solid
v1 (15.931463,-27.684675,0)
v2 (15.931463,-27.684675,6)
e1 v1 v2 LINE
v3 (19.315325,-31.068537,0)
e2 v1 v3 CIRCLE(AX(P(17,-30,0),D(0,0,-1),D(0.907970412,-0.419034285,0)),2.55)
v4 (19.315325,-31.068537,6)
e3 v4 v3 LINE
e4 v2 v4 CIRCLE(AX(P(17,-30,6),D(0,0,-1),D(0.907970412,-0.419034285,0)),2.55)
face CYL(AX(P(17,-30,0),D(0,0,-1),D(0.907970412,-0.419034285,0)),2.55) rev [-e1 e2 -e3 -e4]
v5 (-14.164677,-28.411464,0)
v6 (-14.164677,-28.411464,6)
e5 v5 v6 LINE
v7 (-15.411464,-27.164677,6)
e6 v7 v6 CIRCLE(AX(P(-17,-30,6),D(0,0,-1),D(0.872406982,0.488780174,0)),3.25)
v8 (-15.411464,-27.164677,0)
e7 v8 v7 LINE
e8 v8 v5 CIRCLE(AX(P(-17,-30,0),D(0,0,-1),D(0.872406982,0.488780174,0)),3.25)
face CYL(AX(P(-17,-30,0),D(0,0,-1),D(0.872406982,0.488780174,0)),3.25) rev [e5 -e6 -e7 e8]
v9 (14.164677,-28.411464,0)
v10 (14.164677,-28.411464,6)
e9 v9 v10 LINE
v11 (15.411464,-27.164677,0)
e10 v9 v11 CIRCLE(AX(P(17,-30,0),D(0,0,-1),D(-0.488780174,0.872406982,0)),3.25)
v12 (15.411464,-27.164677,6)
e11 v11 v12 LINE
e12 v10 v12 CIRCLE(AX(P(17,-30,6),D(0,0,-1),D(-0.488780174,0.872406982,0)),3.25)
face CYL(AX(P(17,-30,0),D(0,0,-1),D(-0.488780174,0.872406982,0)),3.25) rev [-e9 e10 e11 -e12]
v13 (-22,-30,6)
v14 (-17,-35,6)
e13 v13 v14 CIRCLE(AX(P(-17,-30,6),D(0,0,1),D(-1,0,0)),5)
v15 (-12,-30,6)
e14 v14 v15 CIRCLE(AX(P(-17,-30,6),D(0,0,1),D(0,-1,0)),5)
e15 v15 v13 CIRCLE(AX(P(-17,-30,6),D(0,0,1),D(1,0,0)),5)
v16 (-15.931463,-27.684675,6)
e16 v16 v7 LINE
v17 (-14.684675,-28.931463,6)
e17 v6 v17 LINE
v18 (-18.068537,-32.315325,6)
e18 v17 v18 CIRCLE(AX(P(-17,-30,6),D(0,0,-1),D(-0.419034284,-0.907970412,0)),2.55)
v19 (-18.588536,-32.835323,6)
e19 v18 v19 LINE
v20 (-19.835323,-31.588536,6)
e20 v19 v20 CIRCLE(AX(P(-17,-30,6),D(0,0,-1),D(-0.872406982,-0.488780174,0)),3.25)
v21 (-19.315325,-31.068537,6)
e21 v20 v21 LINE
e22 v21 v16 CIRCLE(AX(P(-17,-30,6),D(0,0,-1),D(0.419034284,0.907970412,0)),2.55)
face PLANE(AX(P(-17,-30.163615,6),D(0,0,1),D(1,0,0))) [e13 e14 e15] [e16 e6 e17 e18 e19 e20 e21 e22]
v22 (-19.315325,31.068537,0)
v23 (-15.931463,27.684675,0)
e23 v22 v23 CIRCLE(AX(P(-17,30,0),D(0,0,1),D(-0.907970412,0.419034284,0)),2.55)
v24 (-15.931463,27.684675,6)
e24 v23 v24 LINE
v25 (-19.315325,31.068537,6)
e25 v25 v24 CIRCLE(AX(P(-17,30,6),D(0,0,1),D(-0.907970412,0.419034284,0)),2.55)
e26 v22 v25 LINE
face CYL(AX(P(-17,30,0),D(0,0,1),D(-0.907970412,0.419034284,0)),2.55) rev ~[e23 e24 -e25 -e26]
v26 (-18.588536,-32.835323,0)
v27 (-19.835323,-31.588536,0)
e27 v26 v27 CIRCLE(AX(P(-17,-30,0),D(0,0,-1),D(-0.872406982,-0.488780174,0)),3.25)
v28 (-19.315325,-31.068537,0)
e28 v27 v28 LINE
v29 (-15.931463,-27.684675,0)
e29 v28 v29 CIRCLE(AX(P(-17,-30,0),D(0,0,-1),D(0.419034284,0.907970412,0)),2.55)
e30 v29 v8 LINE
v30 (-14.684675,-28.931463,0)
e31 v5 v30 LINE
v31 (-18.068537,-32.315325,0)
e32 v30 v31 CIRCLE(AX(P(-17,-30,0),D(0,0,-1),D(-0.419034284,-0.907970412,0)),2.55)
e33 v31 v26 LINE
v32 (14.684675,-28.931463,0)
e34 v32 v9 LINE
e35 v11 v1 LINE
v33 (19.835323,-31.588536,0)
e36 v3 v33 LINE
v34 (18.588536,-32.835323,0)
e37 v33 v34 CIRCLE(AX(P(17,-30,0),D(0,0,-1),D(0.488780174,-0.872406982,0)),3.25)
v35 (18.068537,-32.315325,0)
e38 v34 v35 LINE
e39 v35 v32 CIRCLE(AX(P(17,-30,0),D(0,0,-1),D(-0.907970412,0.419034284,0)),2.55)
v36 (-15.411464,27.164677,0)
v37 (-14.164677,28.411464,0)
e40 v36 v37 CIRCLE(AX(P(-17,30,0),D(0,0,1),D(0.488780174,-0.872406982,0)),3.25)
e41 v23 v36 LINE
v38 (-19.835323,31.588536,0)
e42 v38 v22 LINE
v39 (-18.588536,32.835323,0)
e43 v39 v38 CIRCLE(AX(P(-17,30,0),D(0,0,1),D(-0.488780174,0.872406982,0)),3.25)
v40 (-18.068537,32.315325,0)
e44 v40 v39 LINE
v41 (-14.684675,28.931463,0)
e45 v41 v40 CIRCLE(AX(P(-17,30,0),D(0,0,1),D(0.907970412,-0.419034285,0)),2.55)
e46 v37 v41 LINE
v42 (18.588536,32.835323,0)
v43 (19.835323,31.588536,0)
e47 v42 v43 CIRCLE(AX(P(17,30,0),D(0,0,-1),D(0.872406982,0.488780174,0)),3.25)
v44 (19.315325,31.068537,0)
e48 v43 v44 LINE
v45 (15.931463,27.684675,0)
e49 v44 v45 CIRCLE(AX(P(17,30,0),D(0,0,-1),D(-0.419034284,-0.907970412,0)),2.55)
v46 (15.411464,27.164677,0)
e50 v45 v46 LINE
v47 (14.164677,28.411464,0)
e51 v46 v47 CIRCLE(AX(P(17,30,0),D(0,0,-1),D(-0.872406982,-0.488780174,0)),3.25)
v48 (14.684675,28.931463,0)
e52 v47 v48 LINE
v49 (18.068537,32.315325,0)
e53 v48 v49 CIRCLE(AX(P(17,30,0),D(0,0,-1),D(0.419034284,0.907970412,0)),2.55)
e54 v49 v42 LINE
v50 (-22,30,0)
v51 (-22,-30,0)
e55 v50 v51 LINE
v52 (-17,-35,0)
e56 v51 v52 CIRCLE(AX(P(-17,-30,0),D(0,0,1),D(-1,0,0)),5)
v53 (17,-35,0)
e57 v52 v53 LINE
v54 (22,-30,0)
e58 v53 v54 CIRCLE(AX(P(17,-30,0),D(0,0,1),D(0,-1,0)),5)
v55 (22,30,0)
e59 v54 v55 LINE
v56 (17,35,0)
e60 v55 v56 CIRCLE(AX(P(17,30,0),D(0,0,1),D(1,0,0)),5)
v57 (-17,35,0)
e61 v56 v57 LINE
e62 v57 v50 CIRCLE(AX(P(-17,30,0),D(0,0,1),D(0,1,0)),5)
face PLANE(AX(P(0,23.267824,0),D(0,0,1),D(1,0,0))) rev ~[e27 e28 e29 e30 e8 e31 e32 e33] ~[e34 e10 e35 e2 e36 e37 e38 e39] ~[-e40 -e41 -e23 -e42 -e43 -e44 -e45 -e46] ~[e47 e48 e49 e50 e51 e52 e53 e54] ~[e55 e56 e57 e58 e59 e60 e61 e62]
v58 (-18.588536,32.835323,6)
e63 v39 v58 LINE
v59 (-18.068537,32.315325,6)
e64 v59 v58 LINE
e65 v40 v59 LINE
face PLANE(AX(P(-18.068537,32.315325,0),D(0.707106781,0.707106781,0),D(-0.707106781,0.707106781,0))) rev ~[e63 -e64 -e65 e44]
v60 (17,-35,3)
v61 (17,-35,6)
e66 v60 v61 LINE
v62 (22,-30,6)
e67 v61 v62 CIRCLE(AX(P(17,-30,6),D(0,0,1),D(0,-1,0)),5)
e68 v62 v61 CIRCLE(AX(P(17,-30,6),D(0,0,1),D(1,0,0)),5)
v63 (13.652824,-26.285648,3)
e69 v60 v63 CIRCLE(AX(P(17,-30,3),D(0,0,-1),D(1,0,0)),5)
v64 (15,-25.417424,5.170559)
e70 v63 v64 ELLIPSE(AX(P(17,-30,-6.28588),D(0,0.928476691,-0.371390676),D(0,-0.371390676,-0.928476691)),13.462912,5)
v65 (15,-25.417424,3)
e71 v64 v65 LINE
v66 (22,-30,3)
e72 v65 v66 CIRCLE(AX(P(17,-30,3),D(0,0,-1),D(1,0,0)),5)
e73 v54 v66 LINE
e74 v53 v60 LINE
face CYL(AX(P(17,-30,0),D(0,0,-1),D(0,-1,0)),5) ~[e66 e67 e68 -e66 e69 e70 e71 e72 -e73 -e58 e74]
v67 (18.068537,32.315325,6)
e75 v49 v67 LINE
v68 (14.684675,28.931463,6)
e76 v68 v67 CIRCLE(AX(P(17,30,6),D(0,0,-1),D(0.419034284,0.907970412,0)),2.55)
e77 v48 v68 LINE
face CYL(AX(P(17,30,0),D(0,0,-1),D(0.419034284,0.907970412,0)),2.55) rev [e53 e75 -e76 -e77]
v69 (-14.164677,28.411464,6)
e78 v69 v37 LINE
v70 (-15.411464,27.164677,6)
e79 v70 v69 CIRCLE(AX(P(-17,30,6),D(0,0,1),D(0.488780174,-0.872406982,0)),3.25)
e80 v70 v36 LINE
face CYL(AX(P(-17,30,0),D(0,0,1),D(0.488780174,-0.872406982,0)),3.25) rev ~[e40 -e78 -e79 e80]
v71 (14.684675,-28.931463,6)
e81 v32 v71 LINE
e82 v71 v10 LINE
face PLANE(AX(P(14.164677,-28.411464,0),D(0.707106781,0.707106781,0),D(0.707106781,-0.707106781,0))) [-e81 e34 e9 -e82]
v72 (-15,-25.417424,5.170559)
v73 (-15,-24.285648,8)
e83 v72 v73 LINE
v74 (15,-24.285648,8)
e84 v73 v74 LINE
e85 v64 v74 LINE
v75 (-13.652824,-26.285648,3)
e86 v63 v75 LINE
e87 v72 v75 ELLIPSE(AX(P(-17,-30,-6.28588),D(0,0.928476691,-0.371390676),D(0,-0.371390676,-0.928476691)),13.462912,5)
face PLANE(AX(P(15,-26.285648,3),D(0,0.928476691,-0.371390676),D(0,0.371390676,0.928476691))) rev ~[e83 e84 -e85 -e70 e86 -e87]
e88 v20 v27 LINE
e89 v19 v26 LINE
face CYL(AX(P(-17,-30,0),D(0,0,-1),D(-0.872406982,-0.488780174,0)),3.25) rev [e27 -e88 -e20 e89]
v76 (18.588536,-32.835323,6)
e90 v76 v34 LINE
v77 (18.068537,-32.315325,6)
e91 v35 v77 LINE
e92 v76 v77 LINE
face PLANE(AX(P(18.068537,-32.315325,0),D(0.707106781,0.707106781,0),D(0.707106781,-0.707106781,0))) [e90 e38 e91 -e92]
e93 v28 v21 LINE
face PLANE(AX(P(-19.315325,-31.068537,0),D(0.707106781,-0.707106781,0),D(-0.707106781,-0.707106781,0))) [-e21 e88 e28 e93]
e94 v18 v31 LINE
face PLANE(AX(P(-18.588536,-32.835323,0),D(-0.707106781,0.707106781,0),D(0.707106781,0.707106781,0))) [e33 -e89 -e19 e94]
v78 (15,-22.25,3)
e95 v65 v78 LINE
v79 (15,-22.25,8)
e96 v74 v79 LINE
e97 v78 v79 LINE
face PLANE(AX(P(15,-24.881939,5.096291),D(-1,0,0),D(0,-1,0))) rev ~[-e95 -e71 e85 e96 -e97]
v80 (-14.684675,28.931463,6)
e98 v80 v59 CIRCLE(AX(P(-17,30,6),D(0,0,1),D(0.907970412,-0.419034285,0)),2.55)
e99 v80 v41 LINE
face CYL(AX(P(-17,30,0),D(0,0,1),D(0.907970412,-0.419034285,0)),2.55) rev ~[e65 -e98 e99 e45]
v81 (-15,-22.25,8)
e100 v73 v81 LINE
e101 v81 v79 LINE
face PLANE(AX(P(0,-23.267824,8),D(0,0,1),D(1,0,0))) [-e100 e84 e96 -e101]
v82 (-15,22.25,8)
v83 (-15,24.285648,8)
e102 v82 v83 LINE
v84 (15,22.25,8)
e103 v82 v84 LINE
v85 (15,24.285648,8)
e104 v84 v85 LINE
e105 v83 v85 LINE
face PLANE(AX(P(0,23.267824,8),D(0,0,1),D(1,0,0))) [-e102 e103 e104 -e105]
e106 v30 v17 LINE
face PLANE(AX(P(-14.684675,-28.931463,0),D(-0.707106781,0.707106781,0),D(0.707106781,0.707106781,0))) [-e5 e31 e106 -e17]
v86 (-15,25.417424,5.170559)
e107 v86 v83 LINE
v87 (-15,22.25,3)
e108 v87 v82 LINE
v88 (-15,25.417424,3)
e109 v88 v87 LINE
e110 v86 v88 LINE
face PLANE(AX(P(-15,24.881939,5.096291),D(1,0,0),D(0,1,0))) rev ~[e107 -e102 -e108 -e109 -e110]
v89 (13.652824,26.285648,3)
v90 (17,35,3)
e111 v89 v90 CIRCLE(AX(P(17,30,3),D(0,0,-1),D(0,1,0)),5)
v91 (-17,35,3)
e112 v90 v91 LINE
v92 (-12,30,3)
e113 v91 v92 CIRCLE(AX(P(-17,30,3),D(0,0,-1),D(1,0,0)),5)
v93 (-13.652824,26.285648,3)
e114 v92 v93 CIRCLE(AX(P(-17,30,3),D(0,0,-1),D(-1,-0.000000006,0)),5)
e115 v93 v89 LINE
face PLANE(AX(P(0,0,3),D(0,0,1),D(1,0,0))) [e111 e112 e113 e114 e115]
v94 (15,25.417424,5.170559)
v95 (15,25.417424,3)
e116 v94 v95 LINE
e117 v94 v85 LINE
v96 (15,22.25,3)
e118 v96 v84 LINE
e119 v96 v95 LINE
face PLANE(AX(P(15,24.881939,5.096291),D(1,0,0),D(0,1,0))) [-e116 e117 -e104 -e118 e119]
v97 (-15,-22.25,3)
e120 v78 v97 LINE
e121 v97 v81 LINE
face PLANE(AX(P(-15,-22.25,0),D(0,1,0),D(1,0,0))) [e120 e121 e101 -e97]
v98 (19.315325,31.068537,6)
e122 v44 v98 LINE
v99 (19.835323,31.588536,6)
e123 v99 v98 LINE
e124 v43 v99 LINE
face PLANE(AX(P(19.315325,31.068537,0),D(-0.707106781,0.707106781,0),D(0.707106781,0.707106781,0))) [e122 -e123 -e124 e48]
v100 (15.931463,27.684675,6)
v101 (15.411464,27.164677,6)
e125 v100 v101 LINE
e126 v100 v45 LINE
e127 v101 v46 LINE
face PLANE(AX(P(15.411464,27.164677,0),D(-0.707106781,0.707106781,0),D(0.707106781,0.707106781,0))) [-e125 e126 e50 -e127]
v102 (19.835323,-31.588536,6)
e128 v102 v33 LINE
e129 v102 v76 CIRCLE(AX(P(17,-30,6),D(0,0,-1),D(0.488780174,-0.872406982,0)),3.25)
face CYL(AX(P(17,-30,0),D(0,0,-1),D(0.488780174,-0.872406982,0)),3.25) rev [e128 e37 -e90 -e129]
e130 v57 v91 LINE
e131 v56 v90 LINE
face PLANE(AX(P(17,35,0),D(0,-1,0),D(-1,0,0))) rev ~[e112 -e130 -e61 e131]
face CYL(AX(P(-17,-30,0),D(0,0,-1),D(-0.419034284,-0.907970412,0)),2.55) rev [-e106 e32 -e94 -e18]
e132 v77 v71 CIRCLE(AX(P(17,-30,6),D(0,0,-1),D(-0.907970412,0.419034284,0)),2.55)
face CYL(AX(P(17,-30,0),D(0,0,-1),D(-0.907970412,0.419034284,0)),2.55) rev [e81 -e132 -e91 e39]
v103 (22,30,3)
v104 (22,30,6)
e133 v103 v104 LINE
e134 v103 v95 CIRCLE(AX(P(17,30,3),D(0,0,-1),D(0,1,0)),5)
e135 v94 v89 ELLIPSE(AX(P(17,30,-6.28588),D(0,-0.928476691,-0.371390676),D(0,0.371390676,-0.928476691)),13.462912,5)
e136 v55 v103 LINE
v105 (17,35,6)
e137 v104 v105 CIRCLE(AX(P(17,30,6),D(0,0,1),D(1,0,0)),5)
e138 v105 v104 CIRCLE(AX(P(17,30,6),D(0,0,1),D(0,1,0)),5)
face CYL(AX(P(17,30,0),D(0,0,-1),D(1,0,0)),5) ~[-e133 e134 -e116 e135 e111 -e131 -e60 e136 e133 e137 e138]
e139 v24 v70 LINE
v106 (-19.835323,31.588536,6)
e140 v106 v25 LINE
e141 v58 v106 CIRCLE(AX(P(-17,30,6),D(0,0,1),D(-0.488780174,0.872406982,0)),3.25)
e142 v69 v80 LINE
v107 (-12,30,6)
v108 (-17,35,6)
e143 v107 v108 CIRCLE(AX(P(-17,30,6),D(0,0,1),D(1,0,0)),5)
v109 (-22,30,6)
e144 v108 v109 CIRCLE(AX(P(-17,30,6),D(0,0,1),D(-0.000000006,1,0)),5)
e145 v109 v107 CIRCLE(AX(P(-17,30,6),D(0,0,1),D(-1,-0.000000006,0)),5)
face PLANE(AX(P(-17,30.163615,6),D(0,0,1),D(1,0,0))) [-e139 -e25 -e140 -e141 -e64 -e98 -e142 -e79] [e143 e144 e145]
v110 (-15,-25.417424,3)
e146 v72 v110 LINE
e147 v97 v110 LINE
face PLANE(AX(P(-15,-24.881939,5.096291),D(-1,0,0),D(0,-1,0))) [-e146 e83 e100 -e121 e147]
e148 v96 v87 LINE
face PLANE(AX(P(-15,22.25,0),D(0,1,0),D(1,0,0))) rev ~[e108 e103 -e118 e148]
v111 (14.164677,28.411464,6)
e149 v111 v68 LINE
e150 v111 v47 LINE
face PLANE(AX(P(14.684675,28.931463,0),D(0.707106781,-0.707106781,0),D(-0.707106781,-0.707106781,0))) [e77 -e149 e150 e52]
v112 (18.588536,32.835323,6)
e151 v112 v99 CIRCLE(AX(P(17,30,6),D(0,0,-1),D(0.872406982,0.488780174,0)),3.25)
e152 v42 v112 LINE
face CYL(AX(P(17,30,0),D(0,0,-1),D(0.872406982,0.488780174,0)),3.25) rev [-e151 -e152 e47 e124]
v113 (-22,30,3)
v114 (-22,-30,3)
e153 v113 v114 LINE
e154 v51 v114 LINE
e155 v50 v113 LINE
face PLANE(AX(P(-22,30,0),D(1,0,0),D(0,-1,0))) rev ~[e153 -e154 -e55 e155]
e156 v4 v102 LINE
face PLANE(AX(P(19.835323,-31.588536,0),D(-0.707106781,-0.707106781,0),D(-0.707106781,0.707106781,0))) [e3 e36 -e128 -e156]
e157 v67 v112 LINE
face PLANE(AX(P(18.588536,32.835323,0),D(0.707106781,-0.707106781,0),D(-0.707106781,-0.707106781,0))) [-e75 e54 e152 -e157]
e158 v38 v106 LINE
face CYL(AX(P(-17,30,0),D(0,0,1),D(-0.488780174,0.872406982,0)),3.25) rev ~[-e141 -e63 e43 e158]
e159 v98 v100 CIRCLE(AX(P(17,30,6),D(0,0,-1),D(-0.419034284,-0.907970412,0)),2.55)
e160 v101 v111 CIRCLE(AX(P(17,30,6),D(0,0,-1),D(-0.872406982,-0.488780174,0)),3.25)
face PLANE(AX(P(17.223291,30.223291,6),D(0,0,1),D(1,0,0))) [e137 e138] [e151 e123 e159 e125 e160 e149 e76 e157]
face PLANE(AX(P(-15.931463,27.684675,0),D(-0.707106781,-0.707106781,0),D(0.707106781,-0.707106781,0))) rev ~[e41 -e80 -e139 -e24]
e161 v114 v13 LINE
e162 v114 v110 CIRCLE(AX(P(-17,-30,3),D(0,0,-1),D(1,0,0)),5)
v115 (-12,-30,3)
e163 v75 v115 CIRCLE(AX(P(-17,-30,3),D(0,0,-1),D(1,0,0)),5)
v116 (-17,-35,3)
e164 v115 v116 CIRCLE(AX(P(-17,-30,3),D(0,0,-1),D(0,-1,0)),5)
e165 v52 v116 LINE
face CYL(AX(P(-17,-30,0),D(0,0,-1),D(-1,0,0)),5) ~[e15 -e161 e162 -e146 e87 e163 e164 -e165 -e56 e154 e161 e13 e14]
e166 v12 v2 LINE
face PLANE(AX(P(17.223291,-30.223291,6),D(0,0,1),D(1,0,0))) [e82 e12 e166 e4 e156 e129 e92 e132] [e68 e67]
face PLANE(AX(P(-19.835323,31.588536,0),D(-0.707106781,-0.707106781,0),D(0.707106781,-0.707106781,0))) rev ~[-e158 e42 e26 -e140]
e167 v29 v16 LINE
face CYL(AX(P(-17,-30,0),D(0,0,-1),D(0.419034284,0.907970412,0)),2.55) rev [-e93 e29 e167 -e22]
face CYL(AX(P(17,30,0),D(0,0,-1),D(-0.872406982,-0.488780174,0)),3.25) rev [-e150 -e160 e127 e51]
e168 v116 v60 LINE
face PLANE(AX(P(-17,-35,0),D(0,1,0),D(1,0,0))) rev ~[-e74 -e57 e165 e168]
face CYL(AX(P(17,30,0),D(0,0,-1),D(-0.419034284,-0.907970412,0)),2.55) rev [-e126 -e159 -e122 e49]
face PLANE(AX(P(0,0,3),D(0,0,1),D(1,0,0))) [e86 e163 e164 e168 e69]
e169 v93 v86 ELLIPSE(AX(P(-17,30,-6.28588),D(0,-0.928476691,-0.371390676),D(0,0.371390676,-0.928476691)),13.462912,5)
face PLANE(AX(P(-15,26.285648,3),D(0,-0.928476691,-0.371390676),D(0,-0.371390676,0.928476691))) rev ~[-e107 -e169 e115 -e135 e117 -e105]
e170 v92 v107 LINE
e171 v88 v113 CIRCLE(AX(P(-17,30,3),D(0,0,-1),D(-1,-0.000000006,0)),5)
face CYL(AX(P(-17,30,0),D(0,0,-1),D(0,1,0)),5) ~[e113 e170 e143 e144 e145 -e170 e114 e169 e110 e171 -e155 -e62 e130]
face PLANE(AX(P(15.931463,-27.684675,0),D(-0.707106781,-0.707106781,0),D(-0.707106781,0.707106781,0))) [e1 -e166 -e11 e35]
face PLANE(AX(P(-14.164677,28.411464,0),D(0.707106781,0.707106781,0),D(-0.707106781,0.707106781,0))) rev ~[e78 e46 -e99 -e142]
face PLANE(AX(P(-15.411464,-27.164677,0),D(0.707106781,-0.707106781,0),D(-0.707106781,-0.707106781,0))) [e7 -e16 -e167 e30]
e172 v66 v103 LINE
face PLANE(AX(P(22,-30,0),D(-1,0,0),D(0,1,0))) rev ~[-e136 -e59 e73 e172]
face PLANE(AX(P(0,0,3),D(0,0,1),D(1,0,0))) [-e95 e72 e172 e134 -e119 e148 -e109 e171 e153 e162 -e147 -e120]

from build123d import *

# Parameters (mm, degrees)
F1_DEPTH    = 3
F3_DEPTH    = 6
F5_DEPTH    = 12.5
F6_W        = 30
F6_H        = 2.0356480181
F7_DEPTH    = 8
F8_T4_DEPTH = 30
F8_T9_DEPTH = 30


# Not quite as in the source:
# - a fillet or chamfer that OpenCascade refuses, or shapes differently, is made with other operations: its cross-section is extruded or revolved along the edge and cut away or added


with BuildPart() as f1:
    # F0 (on Top) → F1 (new body)
    with BuildSketch(Plane.XY):
        with BuildLine():
            ThreePointArc((22, 30), (20.5355339059, 33.5355339059), (17, 35))
            Line((17, 35), (-17, 35))
            ThreePointArc((-17, 35), (-20.5355339059, 33.5355339059), (-22, 30))
            Line((-22, 30), (-22, -30))
            ThreePointArc((-22, -30), (-20.5355339059, -33.5355339059), (-17, -35))
            Line((-17, -35), (17, -35))
            ThreePointArc((17, -35), (20.5355339059, -33.5355339059), (22, -30))
            Line((22, -30), (22, 30))
        make_face()
    extrude(amount=F1_DEPTH)

    # F2 (on Top) → F3 (join)
    with BuildSketch(Plane.XY):
        with BuildLine():
            ThreePointArc((-12, 30), (-13.4644661049, 33.5355339167), (-17.0000000305, 35))
            ThreePointArc((-17.0000000305, 35), (-20.5355339275, 33.5355338843), (-22, 29.9999999695))
            ThreePointArc((-22, 29.9999999695), (-16.9999999847, 25), (-12, 30))
        make_face()
        with BuildLine():
            ThreePointArc((22, 30), (20.5355339059, 33.5355339059), (17, 35))
            ThreePointArc((17, 35), (13.4644660941, 26.4644660941), (22, 30))
        make_face()
        with BuildLine():
            ThreePointArc((17, -35), (20.5355339059, -33.5355339059), (22, -30))
            ThreePointArc((22, -30), (13.4644660941, -26.4644660941), (17, -35))
        make_face()
        with BuildLine():
            ThreePointArc((-12, -30), (-17, -25), (-22, -30))
            ThreePointArc((-22, -30), (-20.5355339059, -33.5355339059), (-17, -35))
            ThreePointArc((-17, -35), (-13.4644660941, -33.5355339059), (-12, -30))
        make_face()
    extrude(amount=F3_DEPTH)

    # F4 (on Top) → F5 (cut, symmetric)
    with BuildSketch(Plane.XY):
        with BuildLine():
            ThreePointArc((-18.0685374254, -32.3153245497), (-15.6256402281, -32.1479374333), (-14.45, -30))
            ThreePointArc((-14.45, -30), (-14.5093597608, -29.4529979899), (-14.6846754503, -28.9314625746))
            Line((-14.6846754503, -28.9314625746), (-18.0685374254, -32.3153245497))
        make_face()
        with BuildLine():
            Line((-18.0685374254, -32.3153245497), (-14.6846754503, -28.9314625746))
            ThreePointArc((-14.6846754503, -28.9314625746), (-15.196877708, -28.196877708), (-15.9314625746, -27.6846754503))
            Line((-15.9314625746, -27.6846754503), (-19.3153245497, -31.0685374254))
            ThreePointArc((-19.3153245497, -31.0685374254), (-18.803122292, -31.803122292), (-18.0685374254, -32.3153245497))
        make_face()
        with BuildLine():
            ThreePointArc((-15.9314625746, -27.6846754503), (-15.196877708, -28.196877708), (-14.6846754503, -28.9314625746))
            Line((-14.6846754503, -28.9314625746), (-14.16467731, -28.4114644343))
            ThreePointArc((-14.16467731, -28.4114644343), (-14.7019029611, -27.7019029611), (-15.4114644343, -27.16467731))
            Line((-15.4114644343, -27.16467731), (-15.9314625746, -27.6846754503))
        make_face()
        with BuildLine():
            Line((-18.5885355657, -32.83532269), (-18.0685374254, -32.3153245497))
            ThreePointArc((-18.0685374254, -32.3153245497), (-18.803122292, -31.803122292), (-19.3153245497, -31.0685374254))
            Line((-19.3153245497, -31.0685374254), (-19.83532269, -31.5885355657))
            ThreePointArc((-19.83532269, -31.5885355657), (-19.2980970389, -32.2980970389), (-18.5885355657, -32.83532269))
        make_face()
        with BuildLine():
            Line((-19.3153245497, -31.0685374254), (-15.9314625746, -27.6846754503))
            ThreePointArc((-15.9314625746, -27.6846754503), (-18.803122292, -28.196877708), (-19.3153245497, -31.0685374254))
        make_face()
        with BuildLine():
            ThreePointArc((19.3153245497, -31.0685374254), (19.4906402392, -30.5470020101), (19.55, -30))
            ThreePointArc((19.55, -30), (18.3743597719, -27.8520625667), (15.9314625746, -27.6846754503))
            Line((15.9314625746, -27.6846754503), (19.3153245497, -31.0685374254))
        make_face()
        with BuildLine():
            Line((19.3153245497, -31.0685374254), (15.9314625746, -27.6846754503))
            ThreePointArc((15.9314625746, -27.6846754503), (15.196877708, -28.196877708), (14.6846754503, -28.9314625746))
            Line((14.6846754503, -28.9314625746), (18.0685374254, -32.3153245497))
            ThreePointArc((18.0685374254, -32.3153245497), (18.803122292, -31.803122292), (19.3153245497, -31.0685374254))
        make_face()
        with BuildLine():
            ThreePointArc((14.6846754503, -28.9314625746), (15.196877708, -28.196877708), (15.9314625746, -27.6846754503))
            Line((15.9314625746, -27.6846754503), (15.4114644343, -27.16467731))
            ThreePointArc((15.4114644343, -27.16467731), (14.7019029611, -27.7019029611), (14.16467731, -28.4114644343))
            Line((14.16467731, -28.4114644343), (14.6846754503, -28.9314625746))
        make_face()
        with BuildLine():
            Line((19.83532269, -31.5885355657), (19.3153245497, -31.0685374254))
            ThreePointArc((19.3153245497, -31.0685374254), (18.803122292, -31.803122292), (18.0685374254, -32.3153245497))
            Line((18.0685374254, -32.3153245497), (18.5885355657, -32.83532269))
            ThreePointArc((18.5885355657, -32.83532269), (19.2980970389, -32.2980970389), (19.83532269, -31.5885355657))
        make_face()
        with BuildLine():
            Line((18.0685374254, -32.3153245497), (14.6846754503, -28.9314625746))
            ThreePointArc((14.6846754503, -28.9314625746), (15.196877708, -31.803122292), (18.0685374254, -32.3153245497))
        make_face()
        with BuildLine():
            ThreePointArc((15.9314625746, 27.6846754503), (18.3743597719, 27.8520625667), (19.55, 30))
            ThreePointArc((19.55, 30), (19.4906402392, 30.5470020101), (19.3153245497, 31.0685374254))
            Line((19.3153245497, 31.0685374254), (15.9314625746, 27.6846754503))
        make_face()
        with BuildLine():
            Line((15.9314625746, 27.6846754503), (19.3153245497, 31.0685374254))
            ThreePointArc((19.3153245497, 31.0685374254), (18.803122292, 31.803122292), (18.0685374254, 32.3153245497))
            Line((18.0685374254, 32.3153245497), (14.6846754503, 28.9314625746))
            ThreePointArc((14.6846754503, 28.9314625746), (15.196877708, 28.196877708), (15.9314625746, 27.6846754503))
        make_face()
        with BuildLine():
            ThreePointArc((18.0685374254, 32.3153245497), (18.803122292, 31.803122292), (19.3153245497, 31.0685374254))
            Line((19.3153245497, 31.0685374254), (19.83532269, 31.5885355657))
            ThreePointArc((19.83532269, 31.5885355657), (19.2980970389, 32.2980970389), (18.5885355657, 32.83532269))
            Line((18.5885355657, 32.83532269), (18.0685374254, 32.3153245497))
        make_face()
        with BuildLine():
            Line((15.4114644343, 27.16467731), (15.9314625746, 27.6846754503))
            ThreePointArc((15.9314625746, 27.6846754503), (15.196877708, 28.196877708), (14.6846754503, 28.9314625746))
            Line((14.6846754503, 28.9314625746), (14.16467731, 28.4114644343))
            ThreePointArc((14.16467731, 28.4114644343), (14.7019029611, 27.7019029611), (15.4114644343, 27.16467731))
        make_face()
        with BuildLine():
            Line((14.6846754503, 28.9314625746), (18.0685374254, 32.3153245497))
            ThreePointArc((18.0685374254, 32.3153245497), (15.196877708, 31.803122292), (14.6846754503, 28.9314625746))
        make_face()
        with BuildLine():
            ThreePointArc((-14.6846754503, 28.9314625746), (-14.5093597608, 29.4529979899), (-14.45, 30))
            ThreePointArc((-14.45, 30), (-15.6256402281, 32.1479374333), (-18.0685374254, 32.3153245497))
            Line((-18.0685374254, 32.3153245497), (-14.6846754503, 28.9314625746))
        make_face()
        with BuildLine():
            Line((-14.6846754503, 28.9314625746), (-18.0685374254, 32.3153245497))
            ThreePointArc((-18.0685374254, 32.3153245497), (-18.803122292, 31.803122292), (-19.3153245497, 31.0685374254))
            Line((-19.3153245497, 31.0685374254), (-15.9314625746, 27.6846754503))
            ThreePointArc((-15.9314625746, 27.6846754503), (-15.196877708, 28.196877708), (-14.6846754503, 28.9314625746))
        make_face()
        with BuildLine():
            ThreePointArc((-19.3153245497, 31.0685374254), (-18.803122292, 31.803122292), (-18.0685374254, 32.3153245497))
            Line((-18.0685374254, 32.3153245497), (-18.5885355657, 32.83532269))
            ThreePointArc((-18.5885355657, 32.83532269), (-19.2980970389, 32.2980970389), (-19.83532269, 31.5885355657))
            Line((-19.83532269, 31.5885355657), (-19.3153245497, 31.0685374254))
        make_face()
        with BuildLine():
            Line((-14.16467731, 28.4114644343), (-14.6846754503, 28.9314625746))
            ThreePointArc((-14.6846754503, 28.9314625746), (-15.196877708, 28.196877708), (-15.9314625746, 27.6846754503))
            Line((-15.9314625746, 27.6846754503), (-15.4114644343, 27.16467731))
            ThreePointArc((-15.4114644343, 27.16467731), (-14.7019029611, 27.7019029611), (-14.16467731, 28.4114644343))
        make_face()
        with BuildLine():
            Line((-15.9314625746, 27.6846754503), (-19.3153245497, 31.0685374254))
            ThreePointArc((-19.3153245497, 31.0685374254), (-18.803122292, 28.196877708), (-15.9314625746, 27.6846754503))
        make_face()
    extrude(amount=F5_DEPTH, both=True, mode=Mode.SUBTRACT)

    # F6 (on Top) → F7 (join)
    with BuildSketch(Plane.XY):
        with Locations((0, 23.2678240091)):
            Rectangle(F6_W, F6_H)
        with Locations((0, -23.2678240091)):
            Rectangle(F6_W, F6_H)
    extrude(amount=F7_DEPTH)

    # F8: chamfer of 5 x 2 on 2 edges, made by hand


with BuildPart() as f8_tool2:
    # F8_s3 → F8_t4 (new body)
    with BuildSketch(Plane.YZ.offset(-15)):
        Polygon((26.2856480181, 3), (24.2856480181, 8), (24.2856480181, 3), align=None)
    extrude(amount=F8_T4_DEPTH)

    split(bisect_by=Plane.XY.offset(8), keep=Keep.BOTTOM)


with BuildPart() as f1_1:
    add(f1.part)

    # F8_t1: union F8_tool2
    add(f8_tool2.part)


with BuildPart() as f8_tool7:
    # F8_s8 → F8_t9 (new body)
    with BuildSketch(Plane.YZ.offset(15)):
        Polygon((-26.2856480181, 3), (-24.2856480181, 8), (-24.2856480181, 3), align=None)
    extrude(amount=-F8_T9_DEPTH)

    split(bisect_by=Plane.XY.offset(8), keep=Keep.BOTTOM)


with BuildPart() as f1_2:
    add(f1_1.part)

    # F8_t6: union F8_tool7
    add(f8_tool7.part)


solid = f1_2.part
